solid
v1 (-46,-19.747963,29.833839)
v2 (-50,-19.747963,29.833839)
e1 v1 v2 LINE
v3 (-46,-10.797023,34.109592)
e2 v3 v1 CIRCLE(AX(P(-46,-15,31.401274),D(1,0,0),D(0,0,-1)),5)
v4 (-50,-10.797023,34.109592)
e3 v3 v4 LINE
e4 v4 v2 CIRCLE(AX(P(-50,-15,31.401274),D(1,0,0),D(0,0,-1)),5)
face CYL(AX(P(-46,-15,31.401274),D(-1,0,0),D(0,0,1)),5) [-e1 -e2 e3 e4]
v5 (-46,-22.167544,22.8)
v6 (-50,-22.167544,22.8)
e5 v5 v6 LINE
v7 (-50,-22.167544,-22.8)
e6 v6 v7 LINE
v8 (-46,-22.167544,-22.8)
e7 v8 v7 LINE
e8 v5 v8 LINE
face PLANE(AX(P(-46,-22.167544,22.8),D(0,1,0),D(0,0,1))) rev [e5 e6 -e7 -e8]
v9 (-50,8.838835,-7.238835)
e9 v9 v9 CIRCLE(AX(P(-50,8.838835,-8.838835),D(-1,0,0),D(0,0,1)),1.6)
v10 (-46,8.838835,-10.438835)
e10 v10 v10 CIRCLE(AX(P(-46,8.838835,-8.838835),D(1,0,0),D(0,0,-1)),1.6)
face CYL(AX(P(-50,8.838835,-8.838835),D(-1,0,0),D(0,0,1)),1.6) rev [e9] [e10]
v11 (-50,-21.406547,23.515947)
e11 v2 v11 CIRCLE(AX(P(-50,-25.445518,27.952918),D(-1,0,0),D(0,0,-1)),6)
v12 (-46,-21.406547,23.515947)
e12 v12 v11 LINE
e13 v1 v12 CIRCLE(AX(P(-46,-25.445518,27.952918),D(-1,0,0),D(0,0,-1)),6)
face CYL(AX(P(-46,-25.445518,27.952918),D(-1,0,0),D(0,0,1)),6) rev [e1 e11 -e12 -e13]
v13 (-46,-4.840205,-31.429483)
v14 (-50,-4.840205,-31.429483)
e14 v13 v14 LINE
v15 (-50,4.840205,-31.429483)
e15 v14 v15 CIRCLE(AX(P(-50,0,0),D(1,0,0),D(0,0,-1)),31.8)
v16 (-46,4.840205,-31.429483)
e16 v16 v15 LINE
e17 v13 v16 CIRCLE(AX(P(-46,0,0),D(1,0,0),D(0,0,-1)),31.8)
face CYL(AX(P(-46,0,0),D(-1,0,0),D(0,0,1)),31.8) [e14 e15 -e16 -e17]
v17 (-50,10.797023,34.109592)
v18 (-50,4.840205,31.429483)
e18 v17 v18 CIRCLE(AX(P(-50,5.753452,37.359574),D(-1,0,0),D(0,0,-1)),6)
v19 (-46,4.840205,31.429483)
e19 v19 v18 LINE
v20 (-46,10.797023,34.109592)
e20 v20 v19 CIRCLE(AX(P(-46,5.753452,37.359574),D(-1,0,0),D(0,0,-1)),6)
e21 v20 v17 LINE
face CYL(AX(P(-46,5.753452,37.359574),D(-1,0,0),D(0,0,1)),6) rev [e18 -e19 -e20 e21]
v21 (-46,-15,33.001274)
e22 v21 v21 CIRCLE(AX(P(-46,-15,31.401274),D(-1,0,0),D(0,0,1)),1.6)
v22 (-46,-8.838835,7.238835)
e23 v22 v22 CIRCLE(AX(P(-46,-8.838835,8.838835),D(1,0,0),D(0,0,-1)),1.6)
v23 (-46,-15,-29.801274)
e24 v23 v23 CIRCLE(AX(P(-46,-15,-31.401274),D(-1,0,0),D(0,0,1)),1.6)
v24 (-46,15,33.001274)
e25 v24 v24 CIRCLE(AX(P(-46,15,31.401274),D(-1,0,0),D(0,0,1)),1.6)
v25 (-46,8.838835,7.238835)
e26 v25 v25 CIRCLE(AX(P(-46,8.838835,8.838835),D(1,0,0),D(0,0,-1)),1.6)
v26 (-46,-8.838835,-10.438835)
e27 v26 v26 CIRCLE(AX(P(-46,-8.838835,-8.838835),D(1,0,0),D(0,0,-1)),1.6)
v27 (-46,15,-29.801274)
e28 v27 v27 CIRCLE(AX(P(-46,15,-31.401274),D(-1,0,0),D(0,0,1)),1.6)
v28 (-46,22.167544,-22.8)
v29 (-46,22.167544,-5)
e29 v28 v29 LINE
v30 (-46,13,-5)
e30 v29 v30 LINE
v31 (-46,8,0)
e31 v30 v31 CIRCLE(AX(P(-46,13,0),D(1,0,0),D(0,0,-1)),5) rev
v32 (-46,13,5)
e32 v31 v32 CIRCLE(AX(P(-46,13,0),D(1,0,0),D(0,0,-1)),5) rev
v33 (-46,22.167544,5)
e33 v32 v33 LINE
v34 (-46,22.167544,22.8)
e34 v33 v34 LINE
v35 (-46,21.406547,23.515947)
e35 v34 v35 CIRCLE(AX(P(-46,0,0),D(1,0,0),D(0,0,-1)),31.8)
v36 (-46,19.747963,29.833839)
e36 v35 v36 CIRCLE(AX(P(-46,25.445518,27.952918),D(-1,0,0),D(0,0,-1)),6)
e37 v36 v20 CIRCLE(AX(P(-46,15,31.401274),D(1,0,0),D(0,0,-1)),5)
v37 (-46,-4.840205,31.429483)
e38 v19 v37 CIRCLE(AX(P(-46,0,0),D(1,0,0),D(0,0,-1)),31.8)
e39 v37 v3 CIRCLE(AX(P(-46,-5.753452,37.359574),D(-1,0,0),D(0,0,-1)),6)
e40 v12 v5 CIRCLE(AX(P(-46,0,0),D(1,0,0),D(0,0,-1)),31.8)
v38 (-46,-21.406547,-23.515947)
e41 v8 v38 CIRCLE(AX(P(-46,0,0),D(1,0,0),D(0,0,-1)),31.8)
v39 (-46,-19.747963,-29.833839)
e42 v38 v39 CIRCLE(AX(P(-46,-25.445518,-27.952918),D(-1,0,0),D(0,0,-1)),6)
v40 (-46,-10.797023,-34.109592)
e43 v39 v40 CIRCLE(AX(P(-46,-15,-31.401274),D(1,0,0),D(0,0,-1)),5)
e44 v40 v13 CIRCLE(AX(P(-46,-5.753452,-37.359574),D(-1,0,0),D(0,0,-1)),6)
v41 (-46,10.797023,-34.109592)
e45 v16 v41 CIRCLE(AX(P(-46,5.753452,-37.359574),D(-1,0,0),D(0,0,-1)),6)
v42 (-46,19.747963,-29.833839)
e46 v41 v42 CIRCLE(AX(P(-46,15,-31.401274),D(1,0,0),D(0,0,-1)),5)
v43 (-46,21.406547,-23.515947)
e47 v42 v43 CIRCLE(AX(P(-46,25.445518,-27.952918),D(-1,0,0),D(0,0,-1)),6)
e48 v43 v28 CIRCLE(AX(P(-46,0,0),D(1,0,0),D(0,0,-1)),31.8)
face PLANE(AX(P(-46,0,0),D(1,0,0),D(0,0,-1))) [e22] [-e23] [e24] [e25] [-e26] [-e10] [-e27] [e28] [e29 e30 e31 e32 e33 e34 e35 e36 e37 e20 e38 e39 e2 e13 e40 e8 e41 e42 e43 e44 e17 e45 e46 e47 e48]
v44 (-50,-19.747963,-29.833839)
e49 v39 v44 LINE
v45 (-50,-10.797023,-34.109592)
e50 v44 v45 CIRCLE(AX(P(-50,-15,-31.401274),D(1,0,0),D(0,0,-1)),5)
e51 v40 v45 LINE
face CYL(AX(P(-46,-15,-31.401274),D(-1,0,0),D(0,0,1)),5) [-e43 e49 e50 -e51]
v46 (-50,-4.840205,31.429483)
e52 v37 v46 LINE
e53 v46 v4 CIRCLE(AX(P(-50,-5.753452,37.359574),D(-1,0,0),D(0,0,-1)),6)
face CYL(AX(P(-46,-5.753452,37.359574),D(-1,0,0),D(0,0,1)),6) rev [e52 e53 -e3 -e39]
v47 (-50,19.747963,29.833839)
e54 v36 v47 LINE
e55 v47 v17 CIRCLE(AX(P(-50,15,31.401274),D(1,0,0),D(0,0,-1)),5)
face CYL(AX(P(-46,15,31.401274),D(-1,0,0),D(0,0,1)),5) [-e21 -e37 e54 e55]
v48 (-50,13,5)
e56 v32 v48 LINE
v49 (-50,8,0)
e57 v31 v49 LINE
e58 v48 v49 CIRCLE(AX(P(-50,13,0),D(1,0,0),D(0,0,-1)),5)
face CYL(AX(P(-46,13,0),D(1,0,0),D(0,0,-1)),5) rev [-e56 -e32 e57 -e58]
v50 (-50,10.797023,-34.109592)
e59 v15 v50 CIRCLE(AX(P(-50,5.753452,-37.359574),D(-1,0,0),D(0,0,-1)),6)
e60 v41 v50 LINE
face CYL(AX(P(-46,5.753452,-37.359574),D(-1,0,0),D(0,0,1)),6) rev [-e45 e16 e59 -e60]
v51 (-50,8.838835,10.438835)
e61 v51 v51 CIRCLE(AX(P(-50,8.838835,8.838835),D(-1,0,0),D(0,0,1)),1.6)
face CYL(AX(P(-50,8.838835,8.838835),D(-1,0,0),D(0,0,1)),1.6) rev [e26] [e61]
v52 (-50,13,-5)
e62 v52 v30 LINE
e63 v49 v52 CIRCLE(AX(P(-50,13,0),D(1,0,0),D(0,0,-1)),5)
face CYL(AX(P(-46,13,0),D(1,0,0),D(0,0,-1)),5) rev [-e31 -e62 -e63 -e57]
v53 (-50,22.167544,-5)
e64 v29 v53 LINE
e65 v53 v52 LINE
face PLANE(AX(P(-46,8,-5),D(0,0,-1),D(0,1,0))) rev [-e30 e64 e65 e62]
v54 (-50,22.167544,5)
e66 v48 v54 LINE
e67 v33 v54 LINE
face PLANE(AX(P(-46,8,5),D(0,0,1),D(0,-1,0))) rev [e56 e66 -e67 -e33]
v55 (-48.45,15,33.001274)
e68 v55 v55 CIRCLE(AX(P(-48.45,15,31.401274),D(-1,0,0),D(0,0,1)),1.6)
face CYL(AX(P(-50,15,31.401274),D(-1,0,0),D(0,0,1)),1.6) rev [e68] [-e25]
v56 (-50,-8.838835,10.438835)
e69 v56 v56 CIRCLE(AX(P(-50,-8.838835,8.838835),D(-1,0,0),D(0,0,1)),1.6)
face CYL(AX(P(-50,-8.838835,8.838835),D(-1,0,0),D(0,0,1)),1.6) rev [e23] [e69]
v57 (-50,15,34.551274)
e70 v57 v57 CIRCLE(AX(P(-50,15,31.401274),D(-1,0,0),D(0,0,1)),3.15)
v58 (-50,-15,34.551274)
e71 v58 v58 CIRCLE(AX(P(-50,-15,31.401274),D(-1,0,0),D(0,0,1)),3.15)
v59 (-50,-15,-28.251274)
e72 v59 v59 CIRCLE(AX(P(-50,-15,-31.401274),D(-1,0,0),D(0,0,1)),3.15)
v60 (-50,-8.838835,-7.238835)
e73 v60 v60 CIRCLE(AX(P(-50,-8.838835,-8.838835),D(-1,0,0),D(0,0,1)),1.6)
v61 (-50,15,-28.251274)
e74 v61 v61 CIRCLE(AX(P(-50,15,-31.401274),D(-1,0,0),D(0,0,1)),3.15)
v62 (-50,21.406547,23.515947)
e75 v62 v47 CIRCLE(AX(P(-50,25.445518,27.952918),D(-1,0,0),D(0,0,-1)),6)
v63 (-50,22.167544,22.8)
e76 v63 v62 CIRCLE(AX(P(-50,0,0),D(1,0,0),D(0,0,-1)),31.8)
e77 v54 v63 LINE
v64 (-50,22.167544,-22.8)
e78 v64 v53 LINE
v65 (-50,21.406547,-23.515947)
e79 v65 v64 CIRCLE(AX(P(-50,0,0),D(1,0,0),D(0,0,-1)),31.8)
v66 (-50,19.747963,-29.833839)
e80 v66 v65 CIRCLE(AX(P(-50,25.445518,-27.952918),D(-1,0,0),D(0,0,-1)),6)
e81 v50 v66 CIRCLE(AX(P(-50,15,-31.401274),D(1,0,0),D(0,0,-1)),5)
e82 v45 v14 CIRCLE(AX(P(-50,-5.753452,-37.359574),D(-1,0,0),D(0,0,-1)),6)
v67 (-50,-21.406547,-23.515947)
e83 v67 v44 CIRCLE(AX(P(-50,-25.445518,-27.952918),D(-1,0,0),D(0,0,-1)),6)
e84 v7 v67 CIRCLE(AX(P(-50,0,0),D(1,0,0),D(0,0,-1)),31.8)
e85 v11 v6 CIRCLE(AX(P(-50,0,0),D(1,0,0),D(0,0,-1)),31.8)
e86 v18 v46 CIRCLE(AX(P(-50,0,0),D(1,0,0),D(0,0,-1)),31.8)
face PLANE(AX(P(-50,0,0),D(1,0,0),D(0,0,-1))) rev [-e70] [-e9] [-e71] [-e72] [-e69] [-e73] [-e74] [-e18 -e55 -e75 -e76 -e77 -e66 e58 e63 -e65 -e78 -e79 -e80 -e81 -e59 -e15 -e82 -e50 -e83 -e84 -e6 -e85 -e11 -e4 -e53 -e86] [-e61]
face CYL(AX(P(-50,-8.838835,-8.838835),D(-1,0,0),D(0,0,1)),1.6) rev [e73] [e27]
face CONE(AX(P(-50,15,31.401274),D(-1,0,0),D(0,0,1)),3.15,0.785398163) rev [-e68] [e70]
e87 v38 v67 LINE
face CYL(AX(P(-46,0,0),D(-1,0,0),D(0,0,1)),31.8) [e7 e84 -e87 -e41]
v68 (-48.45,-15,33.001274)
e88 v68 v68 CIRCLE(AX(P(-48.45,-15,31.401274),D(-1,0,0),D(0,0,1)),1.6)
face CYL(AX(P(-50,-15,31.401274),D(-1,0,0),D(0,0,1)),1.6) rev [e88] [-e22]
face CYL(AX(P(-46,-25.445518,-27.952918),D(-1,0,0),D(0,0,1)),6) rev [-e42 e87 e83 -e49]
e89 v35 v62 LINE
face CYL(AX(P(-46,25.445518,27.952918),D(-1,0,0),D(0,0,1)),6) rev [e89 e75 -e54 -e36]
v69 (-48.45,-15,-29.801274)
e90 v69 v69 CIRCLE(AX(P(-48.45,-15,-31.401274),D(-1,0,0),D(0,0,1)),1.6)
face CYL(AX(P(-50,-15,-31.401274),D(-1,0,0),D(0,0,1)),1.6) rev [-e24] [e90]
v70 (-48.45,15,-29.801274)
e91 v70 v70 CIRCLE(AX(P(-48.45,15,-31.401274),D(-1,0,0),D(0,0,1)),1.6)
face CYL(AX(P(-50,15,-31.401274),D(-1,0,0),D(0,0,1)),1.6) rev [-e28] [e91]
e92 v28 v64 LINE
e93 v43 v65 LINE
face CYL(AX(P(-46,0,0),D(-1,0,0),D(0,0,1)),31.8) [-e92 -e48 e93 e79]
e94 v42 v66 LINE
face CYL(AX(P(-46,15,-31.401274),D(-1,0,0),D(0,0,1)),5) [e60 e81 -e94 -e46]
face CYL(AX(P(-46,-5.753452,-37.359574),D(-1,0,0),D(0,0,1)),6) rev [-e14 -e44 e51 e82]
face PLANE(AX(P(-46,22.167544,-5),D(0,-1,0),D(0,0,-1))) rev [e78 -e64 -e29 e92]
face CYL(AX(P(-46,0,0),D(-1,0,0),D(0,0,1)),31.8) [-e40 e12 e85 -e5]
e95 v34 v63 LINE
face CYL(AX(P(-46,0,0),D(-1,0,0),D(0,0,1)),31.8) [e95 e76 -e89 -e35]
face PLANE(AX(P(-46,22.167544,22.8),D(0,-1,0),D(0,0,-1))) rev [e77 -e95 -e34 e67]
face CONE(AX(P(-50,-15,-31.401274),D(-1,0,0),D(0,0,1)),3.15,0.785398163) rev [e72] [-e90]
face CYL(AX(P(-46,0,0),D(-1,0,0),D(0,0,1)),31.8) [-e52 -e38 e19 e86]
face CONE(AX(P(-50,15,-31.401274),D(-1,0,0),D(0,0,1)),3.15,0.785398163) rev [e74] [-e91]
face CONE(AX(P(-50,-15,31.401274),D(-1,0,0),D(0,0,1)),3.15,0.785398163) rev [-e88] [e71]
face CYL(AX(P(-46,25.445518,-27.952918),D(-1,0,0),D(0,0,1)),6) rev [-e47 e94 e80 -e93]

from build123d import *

# Parameters (mm, degrees)
BOSS_EXTRUDE1_START                                 = -50
BOSS_EXTRUDE1_DEPTH                                 = 4
CSK_FOR_M3_COUNTERSUNK_FLAT_HEAD_SCREW1_D           = 3.2
CSK_FOR_M3_COUNTERSUNK_FLAT_HEAD_SCREW1_CSINK_D     = 6.3
CSK_FOR_M3_COUNTERSUNK_FLAT_HEAD_SCREW1_CSINK_ANGLE = 90
M3_CLEARANCE_HOLE1_D                                = 3.2
FILLET1_R                                           = 5


with BuildPart() as part:
    # Sketch2 → Boss-Extrude1 (new body)
    with BuildSketch(Plane(origin=(0, 0, 0), x_dir=(0, 0, -1), z_dir=(1, 0, 0)).offset(BOSS_EXTRUDE1_START)):
        with BuildLine():
            Line((5, 8), (5, 22.167543842))
            Line((5, 22.167543842), (22.8, 22.167543842))
            ThreePointArc((22.8, 22.167543842), (23.161099135, 21.78998593), (23.515946886, 21.40654671))
            ThreePointArc((23.515946886, 21.40654671), (26.429411238, 19.642162968), (29.833839376, 19.747962631))
            ThreePointArc((29.833839376, 19.747962631), (35.912951138, 17.155172414), (34.109592252, 10.797023497))
            ThreePointArc((34.109592252, 10.797023497), (31.887887506, 8.215289092), (31.429483161, 4.840205393))
            ThreePointArc((31.429483161, 4.840205393), (31.8, 0), (31.429483161, -4.840205393))
            ThreePointArc((31.429483161, -4.840205393), (31.887887506, -8.215289092), (34.109592252, -10.797023497))
            ThreePointArc((34.109592252, -10.797023497), (35.912951138, -17.155172414), (29.833839376, -19.747962631))
            ThreePointArc((29.833839376, -19.747962631), (26.429411238, -19.642162968), (23.515946886, -21.40654671))
            ThreePointArc((23.515946886, -21.40654671), (23.161099135, -21.78998593), (22.8, -22.167543842))
            Line((22.8, -22.167543842), (-22.8, -22.167543842))
            ThreePointArc((-22.8, -22.167543842), (-23.161099135, -21.78998593), (-23.515946886, -21.40654671))
            ThreePointArc((-23.515946886, -21.40654671), (-26.429411238, -19.642162968), (-29.833839376, -19.747962631))
            ThreePointArc((-29.833839376, -19.747962631), (-35.912951138, -17.155172414), (-34.109592252, -10.797023497))
            ThreePointArc((-34.109592252, -10.797023497), (-31.887887506, -8.215289092), (-31.429483161, -4.840205393))
            ThreePointArc((-31.429483161, -4.840205393), (-31.8, 0), (-31.429483161, 4.840205393))
            ThreePointArc((-31.429483161, 4.840205393), (-31.887887506, 8.215289092), (-34.109592252, 10.797023497))
            ThreePointArc((-34.109592252, 10.797023497), (-35.912951138, 17.155172414), (-29.833839376, 19.747962631))
            ThreePointArc((-29.833839376, 19.747962631), (-26.429411238, 19.642162968), (-23.515946886, 21.40654671))
            ThreePointArc((-23.515946886, 21.40654671), (-23.161099135, 21.78998593), (-22.8, 22.167543842))
            Line((-22.8, 22.167543842), (-5, 22.167543842))
            Line((-5, 22.167543842), (-5, 8))
            Line((-5, 8), (5, 8))
        make_face()
    extrude(amount=BOSS_EXTRUDE1_DEPTH)

    # CSK for M3 Countersunk Flat Head Screw1 (through all)
    with Locations(Plane.ZY.offset(50)):
        with Locations((-31.40127386, 15), (-31.40127386, -15), (31.40127386, 15), (31.40127386, -15)):
            CounterSinkHole(CSK_FOR_M3_COUNTERSUNK_FLAT_HEAD_SCREW1_D / 2, CSK_FOR_M3_COUNTERSUNK_FLAT_HEAD_SCREW1_CSINK_D / 2, counter_sink_angle=CSK_FOR_M3_COUNTERSUNK_FLAT_HEAD_SCREW1_CSINK_ANGLE)

    # M3 Clearance Hole1 (through all)
    with Locations(Plane.ZY.offset(50)):
        with Locations((-8.838834765, 8.838834765), (-8.838834765, -8.838834765), (8.838834765, -8.838834765), (8.838834765, 8.838834765)):
            Hole(M3_CLEARANCE_HOLE1_D / 2)

    # Fillet1
    fillet1_edges = [part.edges().sort_by_distance(p)[0] for p in [
        (-48, 8, 5),
        (-48, 8, -5),
    ]]
    fillet(fillet1_edges, radius=FILLET1_R - 0.0001)  # a hair under: the kernel refuses the full size


solid = part.part
